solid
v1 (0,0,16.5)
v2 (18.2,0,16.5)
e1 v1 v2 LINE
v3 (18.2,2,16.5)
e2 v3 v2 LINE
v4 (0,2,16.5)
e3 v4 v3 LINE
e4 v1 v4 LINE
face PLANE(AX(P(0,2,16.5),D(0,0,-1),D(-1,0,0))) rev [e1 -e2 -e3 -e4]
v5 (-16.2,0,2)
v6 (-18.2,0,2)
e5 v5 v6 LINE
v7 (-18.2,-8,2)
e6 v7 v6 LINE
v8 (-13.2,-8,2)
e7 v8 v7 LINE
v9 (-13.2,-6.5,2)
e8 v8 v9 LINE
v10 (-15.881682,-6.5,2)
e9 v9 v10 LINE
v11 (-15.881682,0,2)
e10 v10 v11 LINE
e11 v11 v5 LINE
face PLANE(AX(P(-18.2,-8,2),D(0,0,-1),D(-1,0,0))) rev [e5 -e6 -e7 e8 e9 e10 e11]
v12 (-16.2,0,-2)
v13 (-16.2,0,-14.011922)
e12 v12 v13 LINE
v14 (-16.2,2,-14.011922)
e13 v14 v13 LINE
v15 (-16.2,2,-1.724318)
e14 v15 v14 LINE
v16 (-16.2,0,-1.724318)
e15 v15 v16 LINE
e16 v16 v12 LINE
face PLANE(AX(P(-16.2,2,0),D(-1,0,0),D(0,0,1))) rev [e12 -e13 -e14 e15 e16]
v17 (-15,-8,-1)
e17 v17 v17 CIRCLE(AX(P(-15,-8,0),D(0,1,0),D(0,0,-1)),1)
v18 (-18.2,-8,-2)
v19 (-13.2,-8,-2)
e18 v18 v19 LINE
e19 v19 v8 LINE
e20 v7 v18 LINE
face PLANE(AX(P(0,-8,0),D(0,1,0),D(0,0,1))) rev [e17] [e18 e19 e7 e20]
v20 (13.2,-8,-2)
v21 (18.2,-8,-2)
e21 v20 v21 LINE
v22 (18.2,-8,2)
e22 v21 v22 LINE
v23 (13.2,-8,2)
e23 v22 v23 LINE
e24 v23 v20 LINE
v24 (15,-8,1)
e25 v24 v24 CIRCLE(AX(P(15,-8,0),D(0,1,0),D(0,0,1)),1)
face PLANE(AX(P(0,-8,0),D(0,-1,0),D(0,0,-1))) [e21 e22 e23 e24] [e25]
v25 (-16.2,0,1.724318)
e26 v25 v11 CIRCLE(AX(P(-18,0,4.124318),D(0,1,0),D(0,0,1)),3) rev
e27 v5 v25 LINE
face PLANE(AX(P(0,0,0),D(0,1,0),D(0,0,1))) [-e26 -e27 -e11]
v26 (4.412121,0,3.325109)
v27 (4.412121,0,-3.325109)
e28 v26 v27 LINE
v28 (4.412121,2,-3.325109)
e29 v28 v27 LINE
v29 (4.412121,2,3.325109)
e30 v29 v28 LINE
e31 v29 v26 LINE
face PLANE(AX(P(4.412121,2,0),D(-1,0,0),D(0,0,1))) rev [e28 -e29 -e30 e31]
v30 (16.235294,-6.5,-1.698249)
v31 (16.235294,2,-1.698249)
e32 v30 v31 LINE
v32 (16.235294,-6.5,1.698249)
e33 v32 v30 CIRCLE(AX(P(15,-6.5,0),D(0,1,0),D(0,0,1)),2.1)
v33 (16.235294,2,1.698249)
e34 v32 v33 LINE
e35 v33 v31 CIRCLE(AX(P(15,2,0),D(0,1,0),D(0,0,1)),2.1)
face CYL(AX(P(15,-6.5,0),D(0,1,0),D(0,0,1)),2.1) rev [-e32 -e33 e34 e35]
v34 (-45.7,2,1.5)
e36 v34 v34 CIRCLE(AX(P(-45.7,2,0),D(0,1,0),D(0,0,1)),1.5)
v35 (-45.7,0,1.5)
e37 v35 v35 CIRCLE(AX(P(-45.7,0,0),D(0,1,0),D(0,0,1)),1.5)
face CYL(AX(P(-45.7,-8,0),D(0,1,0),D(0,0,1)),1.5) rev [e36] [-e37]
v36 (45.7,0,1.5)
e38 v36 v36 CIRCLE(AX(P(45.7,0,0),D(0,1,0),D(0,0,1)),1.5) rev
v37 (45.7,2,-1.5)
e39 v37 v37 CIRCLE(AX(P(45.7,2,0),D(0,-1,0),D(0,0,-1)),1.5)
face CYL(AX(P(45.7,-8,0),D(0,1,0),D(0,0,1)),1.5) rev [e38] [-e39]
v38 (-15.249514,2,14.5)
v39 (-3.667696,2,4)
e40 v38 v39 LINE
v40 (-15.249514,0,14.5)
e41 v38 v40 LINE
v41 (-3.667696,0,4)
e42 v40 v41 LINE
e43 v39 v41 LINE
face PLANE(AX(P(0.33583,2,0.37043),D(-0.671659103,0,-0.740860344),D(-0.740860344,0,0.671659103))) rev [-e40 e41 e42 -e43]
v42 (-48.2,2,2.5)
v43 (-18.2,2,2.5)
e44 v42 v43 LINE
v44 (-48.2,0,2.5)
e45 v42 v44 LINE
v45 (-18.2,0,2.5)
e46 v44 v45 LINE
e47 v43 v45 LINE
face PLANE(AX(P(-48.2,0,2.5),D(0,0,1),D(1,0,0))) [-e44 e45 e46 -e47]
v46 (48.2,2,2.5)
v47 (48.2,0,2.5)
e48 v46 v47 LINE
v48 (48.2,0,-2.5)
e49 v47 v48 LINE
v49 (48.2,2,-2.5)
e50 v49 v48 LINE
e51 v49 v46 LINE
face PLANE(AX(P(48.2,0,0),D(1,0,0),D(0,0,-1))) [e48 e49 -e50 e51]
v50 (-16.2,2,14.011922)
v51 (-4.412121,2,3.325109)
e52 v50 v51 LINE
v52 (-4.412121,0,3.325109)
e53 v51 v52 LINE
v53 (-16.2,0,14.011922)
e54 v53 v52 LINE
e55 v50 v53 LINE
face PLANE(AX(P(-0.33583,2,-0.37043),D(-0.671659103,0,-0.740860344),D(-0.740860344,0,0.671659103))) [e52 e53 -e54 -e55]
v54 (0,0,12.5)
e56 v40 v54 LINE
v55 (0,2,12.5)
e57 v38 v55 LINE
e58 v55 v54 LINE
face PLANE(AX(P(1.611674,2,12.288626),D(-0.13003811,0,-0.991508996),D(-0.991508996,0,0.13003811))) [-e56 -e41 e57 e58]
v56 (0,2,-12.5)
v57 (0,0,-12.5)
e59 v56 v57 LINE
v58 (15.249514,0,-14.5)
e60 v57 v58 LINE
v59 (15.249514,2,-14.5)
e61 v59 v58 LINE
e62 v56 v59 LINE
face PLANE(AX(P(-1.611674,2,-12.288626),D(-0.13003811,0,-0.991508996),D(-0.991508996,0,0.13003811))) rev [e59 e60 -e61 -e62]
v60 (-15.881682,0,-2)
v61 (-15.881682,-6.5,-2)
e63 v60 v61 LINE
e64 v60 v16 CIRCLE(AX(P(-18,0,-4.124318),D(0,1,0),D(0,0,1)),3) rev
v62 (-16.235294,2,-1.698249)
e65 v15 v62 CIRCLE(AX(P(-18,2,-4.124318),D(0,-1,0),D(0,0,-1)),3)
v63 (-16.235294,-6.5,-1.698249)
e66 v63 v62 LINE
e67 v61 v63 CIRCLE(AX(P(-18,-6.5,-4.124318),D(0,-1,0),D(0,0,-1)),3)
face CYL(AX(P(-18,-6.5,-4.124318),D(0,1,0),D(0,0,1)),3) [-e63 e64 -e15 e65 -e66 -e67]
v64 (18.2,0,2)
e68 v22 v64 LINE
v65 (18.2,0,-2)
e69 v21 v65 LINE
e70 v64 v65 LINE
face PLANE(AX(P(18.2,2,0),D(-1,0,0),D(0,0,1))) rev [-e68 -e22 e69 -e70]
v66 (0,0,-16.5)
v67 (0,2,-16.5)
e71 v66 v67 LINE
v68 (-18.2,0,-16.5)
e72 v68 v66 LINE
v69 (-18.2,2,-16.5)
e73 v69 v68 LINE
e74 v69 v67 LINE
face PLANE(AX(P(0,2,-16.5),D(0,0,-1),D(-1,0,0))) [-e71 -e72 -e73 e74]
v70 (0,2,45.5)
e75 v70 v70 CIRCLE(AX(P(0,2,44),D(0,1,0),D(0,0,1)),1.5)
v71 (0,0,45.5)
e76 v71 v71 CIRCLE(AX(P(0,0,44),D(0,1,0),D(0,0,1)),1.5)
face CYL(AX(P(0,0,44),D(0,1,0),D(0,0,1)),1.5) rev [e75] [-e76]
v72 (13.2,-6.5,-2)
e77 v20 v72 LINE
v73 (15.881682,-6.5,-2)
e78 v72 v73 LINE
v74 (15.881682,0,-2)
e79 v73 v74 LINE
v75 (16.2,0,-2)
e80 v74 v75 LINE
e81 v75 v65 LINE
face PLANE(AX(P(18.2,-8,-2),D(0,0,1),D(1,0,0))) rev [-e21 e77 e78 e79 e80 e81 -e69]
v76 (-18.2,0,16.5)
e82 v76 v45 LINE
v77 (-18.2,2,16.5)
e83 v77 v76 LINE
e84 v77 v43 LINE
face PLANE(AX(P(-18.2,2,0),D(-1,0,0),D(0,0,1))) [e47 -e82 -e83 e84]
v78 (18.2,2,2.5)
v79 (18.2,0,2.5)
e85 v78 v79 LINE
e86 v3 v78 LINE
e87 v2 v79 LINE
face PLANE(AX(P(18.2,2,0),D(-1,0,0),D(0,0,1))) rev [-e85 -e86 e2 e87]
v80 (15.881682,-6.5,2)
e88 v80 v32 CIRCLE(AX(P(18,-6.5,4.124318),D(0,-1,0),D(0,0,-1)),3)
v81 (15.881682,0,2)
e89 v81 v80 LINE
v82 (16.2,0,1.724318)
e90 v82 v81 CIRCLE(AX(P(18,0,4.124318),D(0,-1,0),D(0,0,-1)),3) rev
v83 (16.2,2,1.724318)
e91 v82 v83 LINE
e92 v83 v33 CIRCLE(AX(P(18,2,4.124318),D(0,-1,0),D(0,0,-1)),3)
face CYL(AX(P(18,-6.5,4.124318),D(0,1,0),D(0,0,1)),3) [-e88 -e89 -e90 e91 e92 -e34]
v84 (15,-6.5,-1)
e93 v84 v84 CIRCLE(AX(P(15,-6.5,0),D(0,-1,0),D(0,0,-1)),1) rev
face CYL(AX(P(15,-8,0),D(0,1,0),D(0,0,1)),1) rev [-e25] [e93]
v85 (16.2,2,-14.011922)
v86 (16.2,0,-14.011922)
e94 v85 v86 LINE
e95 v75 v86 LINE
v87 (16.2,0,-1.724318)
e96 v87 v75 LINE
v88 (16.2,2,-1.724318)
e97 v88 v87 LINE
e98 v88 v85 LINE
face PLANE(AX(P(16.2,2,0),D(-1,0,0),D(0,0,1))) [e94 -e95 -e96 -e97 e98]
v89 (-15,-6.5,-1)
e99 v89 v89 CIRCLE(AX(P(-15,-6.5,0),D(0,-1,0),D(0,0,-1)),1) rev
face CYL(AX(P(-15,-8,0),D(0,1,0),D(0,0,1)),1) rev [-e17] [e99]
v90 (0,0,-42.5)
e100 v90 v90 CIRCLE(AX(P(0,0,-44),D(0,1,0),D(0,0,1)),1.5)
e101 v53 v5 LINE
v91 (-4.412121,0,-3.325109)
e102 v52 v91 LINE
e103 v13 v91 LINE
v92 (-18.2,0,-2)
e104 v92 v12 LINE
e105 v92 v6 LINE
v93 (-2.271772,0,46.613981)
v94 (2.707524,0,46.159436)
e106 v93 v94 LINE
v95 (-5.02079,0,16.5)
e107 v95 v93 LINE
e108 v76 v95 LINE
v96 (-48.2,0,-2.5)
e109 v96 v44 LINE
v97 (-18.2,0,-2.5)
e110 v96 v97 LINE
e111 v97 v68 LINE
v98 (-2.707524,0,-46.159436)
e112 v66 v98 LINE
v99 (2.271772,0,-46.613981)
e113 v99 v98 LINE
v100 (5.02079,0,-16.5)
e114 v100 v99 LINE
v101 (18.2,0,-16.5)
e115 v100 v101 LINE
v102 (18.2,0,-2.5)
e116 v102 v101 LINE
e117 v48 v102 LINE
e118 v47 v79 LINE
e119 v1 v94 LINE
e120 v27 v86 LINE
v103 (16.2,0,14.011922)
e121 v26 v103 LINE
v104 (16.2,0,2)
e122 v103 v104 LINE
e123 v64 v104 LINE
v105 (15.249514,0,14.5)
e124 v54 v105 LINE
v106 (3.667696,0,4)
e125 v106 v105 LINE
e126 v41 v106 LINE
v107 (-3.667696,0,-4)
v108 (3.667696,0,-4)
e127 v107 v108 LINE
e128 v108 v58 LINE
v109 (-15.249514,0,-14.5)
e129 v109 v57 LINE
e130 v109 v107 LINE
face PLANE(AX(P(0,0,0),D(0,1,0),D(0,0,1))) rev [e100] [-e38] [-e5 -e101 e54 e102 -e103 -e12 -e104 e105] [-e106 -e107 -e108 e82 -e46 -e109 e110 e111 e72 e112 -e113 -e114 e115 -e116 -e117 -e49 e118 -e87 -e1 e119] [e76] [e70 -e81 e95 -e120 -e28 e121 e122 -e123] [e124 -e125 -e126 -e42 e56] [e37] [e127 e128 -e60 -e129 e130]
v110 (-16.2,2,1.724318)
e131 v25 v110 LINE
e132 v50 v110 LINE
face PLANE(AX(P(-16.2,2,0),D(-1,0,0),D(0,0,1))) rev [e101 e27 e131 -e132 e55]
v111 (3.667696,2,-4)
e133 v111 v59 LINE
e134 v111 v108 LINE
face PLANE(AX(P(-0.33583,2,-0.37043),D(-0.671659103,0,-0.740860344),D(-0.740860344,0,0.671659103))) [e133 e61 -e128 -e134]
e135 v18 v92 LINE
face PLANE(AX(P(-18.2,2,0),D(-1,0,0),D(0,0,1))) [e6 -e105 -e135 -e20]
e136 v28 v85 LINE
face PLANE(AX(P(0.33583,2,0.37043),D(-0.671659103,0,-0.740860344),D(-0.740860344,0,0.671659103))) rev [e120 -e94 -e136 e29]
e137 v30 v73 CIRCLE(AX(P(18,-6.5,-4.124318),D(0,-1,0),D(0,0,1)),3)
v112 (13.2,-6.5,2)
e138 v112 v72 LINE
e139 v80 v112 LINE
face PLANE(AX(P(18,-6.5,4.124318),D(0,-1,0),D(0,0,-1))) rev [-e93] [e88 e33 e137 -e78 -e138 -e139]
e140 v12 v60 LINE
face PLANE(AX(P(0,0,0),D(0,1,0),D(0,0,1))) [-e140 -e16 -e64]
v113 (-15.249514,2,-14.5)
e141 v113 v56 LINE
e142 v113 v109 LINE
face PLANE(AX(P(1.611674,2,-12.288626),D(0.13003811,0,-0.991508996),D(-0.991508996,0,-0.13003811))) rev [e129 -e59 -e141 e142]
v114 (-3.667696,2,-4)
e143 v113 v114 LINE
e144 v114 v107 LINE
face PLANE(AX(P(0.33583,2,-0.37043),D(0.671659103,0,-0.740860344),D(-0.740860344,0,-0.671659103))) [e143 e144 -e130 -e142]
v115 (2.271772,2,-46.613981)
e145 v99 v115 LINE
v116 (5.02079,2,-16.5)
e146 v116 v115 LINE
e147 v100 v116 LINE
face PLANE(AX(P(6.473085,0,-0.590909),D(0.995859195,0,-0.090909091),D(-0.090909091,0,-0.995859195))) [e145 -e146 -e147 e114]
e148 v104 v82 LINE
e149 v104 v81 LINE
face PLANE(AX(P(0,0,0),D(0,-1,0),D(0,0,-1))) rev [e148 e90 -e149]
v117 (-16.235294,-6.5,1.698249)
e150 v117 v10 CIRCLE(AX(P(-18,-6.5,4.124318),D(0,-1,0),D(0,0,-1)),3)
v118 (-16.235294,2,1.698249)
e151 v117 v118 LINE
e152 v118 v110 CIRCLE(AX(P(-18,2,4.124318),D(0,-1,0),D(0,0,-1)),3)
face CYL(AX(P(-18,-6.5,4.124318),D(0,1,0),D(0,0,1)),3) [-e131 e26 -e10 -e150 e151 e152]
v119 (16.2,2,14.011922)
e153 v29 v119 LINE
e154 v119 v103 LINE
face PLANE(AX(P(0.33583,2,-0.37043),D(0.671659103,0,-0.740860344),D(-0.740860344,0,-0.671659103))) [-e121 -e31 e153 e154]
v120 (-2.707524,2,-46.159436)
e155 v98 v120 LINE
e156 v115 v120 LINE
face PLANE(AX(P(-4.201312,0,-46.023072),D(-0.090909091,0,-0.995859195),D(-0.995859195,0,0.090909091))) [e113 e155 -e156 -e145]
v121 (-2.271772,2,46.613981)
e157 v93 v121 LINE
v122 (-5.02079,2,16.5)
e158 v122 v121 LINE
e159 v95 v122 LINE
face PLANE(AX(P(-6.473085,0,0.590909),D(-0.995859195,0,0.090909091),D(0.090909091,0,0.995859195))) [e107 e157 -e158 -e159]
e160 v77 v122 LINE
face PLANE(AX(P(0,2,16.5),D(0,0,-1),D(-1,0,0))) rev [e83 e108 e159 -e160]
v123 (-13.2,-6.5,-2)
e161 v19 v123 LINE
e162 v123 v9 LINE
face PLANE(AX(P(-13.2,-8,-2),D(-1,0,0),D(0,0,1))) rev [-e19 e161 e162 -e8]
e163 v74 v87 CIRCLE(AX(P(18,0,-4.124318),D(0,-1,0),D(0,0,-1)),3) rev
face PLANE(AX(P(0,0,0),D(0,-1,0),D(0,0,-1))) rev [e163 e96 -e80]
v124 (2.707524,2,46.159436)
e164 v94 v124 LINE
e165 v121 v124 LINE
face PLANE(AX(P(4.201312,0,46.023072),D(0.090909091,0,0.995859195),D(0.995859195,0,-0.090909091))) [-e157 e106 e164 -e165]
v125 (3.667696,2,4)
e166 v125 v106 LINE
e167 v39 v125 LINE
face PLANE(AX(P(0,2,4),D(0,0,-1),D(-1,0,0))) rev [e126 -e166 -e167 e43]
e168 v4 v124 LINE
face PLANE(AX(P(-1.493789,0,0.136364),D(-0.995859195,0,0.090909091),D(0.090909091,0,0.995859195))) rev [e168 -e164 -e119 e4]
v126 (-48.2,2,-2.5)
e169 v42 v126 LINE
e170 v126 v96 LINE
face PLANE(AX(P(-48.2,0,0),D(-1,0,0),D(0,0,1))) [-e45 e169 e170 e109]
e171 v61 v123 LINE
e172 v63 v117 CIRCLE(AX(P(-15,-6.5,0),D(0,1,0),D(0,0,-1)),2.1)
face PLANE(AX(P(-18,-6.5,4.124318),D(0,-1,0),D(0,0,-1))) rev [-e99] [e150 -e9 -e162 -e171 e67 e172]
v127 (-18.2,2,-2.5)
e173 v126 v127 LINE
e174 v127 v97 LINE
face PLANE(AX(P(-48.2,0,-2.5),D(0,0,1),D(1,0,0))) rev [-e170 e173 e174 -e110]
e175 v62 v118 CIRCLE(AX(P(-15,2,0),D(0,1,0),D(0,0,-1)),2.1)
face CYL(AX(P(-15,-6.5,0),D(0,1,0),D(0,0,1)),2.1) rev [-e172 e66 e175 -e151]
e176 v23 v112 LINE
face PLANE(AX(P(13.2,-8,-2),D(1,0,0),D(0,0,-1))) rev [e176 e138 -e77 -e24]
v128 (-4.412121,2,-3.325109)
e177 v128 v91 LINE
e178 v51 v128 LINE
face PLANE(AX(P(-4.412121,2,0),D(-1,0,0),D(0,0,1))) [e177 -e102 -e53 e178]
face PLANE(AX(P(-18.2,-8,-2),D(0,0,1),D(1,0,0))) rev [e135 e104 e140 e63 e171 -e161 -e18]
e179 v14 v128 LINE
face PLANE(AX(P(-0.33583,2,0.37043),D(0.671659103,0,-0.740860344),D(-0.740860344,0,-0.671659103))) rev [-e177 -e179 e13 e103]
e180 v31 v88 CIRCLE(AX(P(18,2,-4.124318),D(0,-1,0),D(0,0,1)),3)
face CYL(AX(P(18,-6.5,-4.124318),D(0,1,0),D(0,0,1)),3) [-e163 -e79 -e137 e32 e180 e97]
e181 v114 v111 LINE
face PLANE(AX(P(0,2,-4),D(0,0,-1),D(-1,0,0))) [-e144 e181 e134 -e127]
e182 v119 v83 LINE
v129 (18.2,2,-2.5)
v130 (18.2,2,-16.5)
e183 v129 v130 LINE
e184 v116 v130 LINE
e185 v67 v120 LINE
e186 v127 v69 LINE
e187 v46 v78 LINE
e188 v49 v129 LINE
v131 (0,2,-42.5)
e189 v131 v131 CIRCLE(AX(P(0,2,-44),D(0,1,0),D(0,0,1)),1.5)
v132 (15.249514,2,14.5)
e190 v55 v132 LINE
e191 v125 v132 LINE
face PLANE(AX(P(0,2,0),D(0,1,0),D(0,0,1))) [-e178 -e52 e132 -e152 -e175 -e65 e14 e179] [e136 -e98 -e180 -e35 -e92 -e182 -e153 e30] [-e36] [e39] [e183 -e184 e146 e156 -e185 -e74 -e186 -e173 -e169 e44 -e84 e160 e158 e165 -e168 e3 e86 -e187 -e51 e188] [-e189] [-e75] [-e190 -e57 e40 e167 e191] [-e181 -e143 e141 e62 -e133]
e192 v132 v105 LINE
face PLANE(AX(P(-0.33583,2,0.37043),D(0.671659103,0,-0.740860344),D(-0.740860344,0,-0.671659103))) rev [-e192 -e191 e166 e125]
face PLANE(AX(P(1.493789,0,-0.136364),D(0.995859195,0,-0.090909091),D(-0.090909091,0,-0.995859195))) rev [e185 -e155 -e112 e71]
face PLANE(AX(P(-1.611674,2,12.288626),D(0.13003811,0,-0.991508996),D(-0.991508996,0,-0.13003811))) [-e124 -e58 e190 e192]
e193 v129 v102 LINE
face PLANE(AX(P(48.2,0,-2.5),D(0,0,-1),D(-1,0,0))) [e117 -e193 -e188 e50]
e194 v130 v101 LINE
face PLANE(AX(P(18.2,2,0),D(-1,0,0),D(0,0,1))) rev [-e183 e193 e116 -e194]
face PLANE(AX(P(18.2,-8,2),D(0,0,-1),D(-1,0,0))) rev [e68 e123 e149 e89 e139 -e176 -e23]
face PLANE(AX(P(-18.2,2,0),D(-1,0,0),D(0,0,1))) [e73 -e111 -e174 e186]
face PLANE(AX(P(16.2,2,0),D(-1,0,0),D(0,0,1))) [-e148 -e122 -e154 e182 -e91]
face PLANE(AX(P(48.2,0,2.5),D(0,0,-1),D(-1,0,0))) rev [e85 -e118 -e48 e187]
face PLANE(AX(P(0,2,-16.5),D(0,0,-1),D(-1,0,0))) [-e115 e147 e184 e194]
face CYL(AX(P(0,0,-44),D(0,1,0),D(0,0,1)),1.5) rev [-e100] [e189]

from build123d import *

# Parameters (mm, degrees)
SKETCH1_W           = 36.4
SKETCH1_H           = 33
BOSS_EXTRUDE1_DEPTH = 2
SKETCH2_W           = 5
SKETCH2_H           = 4
BOSS_EXTRUDE2_DEPTH = 8
SKETCH4_R           = 1
CUT_EXTRUDE2_DEPTH  = 27.162759793
CUT_EXTRUDE1_DEPTH  = 8.5
SKETCH5_W           = 5
SKETCH5_H           = 2
BOSS_EXTRUDE3_DEPTH = 30
SKETCH6_W           = 5
SKETCH6_H           = 2
BOSS_EXTRUDE4_DEPTH = 30
SKETCH11_R          = 1.5
CUT_EXTRUDE3_DEPTH  = 52.918108594
SKETCH10_R          = 1.5
BOSS_EXTRUDE5_DEPTH = 2


with BuildPart() as part:
    # Sketch1 → Boss-Extrude1 (new body)
    with BuildSketch(Plane(origin=(0, 0, 0), x_dir=(1, 0, 0), z_dir=(0, 1, 0))):
        Rectangle(SKETCH1_W, SKETCH1_H)
        Polygon((-4.412121212, -3.325108971), (-16.2, -14.011922158), (-16.2, 14.011922158), (-4.412121212, 3.325108971), align=None, mode=Mode.SUBTRACT)
        Polygon((-15.249514138, -14.5), (-3.667695956, -4), (3.667695956, -4), (15.249514138, -14.5), (0, -12.5), align=None, mode=Mode.SUBTRACT)
        Polygon((16.2, -14.011922158), (4.412121212, -3.325108971), (4.412121212, 3.325108971), (16.2, 14.011922158), align=None, mode=Mode.SUBTRACT)
        Polygon((15.249514138, 14.5), (3.667695956, 4), (-3.667695956, 4), (-15.249514138, 14.5), (0, 12.5), align=None, mode=Mode.SUBTRACT)
    extrude(amount=BOSS_EXTRUDE1_DEPTH)

    # Sketch2 → Boss-Extrude2 (add)
    with BuildSketch(Plane.XZ):
        with Locations((15.7, 0)):
            Rectangle(SKETCH2_W, SKETCH2_H)
        with Locations((-15.7, 0)):
            Rectangle(SKETCH2_W, SKETCH2_H)
    extrude(amount=BOSS_EXTRUDE2_DEPTH)

    # Sketch4 → Cut-Extrude2 (cut, through all)
    with BuildSketch(Plane(origin=(0, 1, 0), x_dir=(1, 0, 0), z_dir=(0, 1, 0))):
        with Locations((15, 0)):
            Circle(SKETCH4_R)
        with Locations((-15, 0)):
            Circle(SKETCH4_R)
    extrude(amount=-CUT_EXTRUDE2_DEPTH, mode=Mode.SUBTRACT)

    # Sketch3 → Cut-Extrude1 (cut)
    with BuildSketch(Plane(origin=(0, 2, 0), x_dir=(1, 0, 0), z_dir=(0, 1, 0))):
        with BuildLine():
            Line((15, 4.124318125), (15, 4.257967602))
            Line((15, 4.257967602), (10.3221916, 4.257967602))
            Line((10.3221916, 4.257967602), (10.3221916, -5.239749404))
            Line((10.3221916, -5.239749404), (15, -5.239749404))
            Line((15, -5.239749404), (15, -4.124318125))
            ThreePointArc((15, -4.124318125), (15.326601634, -2.763090306), (16.235294118, -1.69824864))
            ThreePointArc((16.235294118, -1.69824864), (17.1, 0), (16.235294118, 1.69824864))
            ThreePointArc((16.235294118, 1.69824864), (15.326601634, 2.763090306), (15, 4.124318125))
        make_face()
        with BuildLine():
            Line((-10.3221916, -5.239749404), (-15, -5.239749404))
            Line((-15, -5.239749404), (-15, -4.124318125))
            ThreePointArc((-15, -4.124318125), (-15.326601634, -2.763090306), (-16.235294118, -1.69824864))
            ThreePointArc((-16.235294118, -1.69824864), (-17.1, 0), (-16.235294118, 1.69824864))
            ThreePointArc((-16.235294118, 1.69824864), (-15.326601634, 2.763090306), (-15, 4.124318125))
            Line((-15, 4.124318125), (-15, 4.257967602))
            Line((-15, 4.257967602), (-10.3221916, 4.257967602))
            Line((-10.3221916, 4.257967602), (-10.3221916, -5.239749404))
        make_face()
    extrude(amount=-CUT_EXTRUDE1_DEPTH, mode=Mode.SUBTRACT)

    # Sketch5 → Boss-Extrude3 (add)
    with BuildSketch(Plane.ZY.offset(18.2)):
        with Locations((0, 1)):
            Rectangle(SKETCH5_W, SKETCH5_H)
    extrude(amount=BOSS_EXTRUDE3_DEPTH)

    # Sketch6 → Boss-Extrude4 (add)
    with BuildSketch(Plane(origin=(18.2, 0, 0), x_dir=(0, 0, -1), z_dir=(1, 0, 0))):
        with Locations((0, 1)):
            Rectangle(SKETCH6_W, SKETCH6_H)
    extrude(amount=BOSS_EXTRUDE4_DEPTH)

    # Sketch11 → Cut-Extrude3 (cut, through all)
    with BuildSketch(Plane(origin=(0, 2, 0), x_dir=(1, 0, 0), z_dir=(0, 1, 0))):
        with Locations((-45.7, 0)):
            Circle(SKETCH11_R)
        with Locations((45.7, 0)):
            Circle(SKETCH11_R)
    extrude(amount=-CUT_EXTRUDE3_DEPTH, mode=Mode.SUBTRACT)

    # Sketch10 → Boss-Extrude5 (add)
    # profile 1 of 2: a face of its own
    with BuildSketch(Plane(origin=(0, 2, 0), x_dir=(1, 0, 0), z_dir=(0, 1, 0))):
        Polygon((0, -16.5), (-5.02079011, -16.5), (-2.27177232, -46.613981094), (2.707523657, -46.15943564), align=None)
        with Locations((0, -44)):
            Circle(SKETCH10_R, mode=Mode.SUBTRACT)
    # profile 2 of 2: a face of its own
    with BuildSketch(Plane(origin=(0, 2, 0), x_dir=(1, 0, 0), z_dir=(0, 1, 0))):
        Polygon((0, 16.5), (5.02079011, 16.5), (2.27177232, 46.613981094), (-2.707523657, 46.15943564), align=None)
        with Locations((0, 44)):
            Circle(SKETCH10_R, mode=Mode.SUBTRACT)
    extrude(amount=-BOSS_EXTRUDE5_DEPTH)


solid = part.part
